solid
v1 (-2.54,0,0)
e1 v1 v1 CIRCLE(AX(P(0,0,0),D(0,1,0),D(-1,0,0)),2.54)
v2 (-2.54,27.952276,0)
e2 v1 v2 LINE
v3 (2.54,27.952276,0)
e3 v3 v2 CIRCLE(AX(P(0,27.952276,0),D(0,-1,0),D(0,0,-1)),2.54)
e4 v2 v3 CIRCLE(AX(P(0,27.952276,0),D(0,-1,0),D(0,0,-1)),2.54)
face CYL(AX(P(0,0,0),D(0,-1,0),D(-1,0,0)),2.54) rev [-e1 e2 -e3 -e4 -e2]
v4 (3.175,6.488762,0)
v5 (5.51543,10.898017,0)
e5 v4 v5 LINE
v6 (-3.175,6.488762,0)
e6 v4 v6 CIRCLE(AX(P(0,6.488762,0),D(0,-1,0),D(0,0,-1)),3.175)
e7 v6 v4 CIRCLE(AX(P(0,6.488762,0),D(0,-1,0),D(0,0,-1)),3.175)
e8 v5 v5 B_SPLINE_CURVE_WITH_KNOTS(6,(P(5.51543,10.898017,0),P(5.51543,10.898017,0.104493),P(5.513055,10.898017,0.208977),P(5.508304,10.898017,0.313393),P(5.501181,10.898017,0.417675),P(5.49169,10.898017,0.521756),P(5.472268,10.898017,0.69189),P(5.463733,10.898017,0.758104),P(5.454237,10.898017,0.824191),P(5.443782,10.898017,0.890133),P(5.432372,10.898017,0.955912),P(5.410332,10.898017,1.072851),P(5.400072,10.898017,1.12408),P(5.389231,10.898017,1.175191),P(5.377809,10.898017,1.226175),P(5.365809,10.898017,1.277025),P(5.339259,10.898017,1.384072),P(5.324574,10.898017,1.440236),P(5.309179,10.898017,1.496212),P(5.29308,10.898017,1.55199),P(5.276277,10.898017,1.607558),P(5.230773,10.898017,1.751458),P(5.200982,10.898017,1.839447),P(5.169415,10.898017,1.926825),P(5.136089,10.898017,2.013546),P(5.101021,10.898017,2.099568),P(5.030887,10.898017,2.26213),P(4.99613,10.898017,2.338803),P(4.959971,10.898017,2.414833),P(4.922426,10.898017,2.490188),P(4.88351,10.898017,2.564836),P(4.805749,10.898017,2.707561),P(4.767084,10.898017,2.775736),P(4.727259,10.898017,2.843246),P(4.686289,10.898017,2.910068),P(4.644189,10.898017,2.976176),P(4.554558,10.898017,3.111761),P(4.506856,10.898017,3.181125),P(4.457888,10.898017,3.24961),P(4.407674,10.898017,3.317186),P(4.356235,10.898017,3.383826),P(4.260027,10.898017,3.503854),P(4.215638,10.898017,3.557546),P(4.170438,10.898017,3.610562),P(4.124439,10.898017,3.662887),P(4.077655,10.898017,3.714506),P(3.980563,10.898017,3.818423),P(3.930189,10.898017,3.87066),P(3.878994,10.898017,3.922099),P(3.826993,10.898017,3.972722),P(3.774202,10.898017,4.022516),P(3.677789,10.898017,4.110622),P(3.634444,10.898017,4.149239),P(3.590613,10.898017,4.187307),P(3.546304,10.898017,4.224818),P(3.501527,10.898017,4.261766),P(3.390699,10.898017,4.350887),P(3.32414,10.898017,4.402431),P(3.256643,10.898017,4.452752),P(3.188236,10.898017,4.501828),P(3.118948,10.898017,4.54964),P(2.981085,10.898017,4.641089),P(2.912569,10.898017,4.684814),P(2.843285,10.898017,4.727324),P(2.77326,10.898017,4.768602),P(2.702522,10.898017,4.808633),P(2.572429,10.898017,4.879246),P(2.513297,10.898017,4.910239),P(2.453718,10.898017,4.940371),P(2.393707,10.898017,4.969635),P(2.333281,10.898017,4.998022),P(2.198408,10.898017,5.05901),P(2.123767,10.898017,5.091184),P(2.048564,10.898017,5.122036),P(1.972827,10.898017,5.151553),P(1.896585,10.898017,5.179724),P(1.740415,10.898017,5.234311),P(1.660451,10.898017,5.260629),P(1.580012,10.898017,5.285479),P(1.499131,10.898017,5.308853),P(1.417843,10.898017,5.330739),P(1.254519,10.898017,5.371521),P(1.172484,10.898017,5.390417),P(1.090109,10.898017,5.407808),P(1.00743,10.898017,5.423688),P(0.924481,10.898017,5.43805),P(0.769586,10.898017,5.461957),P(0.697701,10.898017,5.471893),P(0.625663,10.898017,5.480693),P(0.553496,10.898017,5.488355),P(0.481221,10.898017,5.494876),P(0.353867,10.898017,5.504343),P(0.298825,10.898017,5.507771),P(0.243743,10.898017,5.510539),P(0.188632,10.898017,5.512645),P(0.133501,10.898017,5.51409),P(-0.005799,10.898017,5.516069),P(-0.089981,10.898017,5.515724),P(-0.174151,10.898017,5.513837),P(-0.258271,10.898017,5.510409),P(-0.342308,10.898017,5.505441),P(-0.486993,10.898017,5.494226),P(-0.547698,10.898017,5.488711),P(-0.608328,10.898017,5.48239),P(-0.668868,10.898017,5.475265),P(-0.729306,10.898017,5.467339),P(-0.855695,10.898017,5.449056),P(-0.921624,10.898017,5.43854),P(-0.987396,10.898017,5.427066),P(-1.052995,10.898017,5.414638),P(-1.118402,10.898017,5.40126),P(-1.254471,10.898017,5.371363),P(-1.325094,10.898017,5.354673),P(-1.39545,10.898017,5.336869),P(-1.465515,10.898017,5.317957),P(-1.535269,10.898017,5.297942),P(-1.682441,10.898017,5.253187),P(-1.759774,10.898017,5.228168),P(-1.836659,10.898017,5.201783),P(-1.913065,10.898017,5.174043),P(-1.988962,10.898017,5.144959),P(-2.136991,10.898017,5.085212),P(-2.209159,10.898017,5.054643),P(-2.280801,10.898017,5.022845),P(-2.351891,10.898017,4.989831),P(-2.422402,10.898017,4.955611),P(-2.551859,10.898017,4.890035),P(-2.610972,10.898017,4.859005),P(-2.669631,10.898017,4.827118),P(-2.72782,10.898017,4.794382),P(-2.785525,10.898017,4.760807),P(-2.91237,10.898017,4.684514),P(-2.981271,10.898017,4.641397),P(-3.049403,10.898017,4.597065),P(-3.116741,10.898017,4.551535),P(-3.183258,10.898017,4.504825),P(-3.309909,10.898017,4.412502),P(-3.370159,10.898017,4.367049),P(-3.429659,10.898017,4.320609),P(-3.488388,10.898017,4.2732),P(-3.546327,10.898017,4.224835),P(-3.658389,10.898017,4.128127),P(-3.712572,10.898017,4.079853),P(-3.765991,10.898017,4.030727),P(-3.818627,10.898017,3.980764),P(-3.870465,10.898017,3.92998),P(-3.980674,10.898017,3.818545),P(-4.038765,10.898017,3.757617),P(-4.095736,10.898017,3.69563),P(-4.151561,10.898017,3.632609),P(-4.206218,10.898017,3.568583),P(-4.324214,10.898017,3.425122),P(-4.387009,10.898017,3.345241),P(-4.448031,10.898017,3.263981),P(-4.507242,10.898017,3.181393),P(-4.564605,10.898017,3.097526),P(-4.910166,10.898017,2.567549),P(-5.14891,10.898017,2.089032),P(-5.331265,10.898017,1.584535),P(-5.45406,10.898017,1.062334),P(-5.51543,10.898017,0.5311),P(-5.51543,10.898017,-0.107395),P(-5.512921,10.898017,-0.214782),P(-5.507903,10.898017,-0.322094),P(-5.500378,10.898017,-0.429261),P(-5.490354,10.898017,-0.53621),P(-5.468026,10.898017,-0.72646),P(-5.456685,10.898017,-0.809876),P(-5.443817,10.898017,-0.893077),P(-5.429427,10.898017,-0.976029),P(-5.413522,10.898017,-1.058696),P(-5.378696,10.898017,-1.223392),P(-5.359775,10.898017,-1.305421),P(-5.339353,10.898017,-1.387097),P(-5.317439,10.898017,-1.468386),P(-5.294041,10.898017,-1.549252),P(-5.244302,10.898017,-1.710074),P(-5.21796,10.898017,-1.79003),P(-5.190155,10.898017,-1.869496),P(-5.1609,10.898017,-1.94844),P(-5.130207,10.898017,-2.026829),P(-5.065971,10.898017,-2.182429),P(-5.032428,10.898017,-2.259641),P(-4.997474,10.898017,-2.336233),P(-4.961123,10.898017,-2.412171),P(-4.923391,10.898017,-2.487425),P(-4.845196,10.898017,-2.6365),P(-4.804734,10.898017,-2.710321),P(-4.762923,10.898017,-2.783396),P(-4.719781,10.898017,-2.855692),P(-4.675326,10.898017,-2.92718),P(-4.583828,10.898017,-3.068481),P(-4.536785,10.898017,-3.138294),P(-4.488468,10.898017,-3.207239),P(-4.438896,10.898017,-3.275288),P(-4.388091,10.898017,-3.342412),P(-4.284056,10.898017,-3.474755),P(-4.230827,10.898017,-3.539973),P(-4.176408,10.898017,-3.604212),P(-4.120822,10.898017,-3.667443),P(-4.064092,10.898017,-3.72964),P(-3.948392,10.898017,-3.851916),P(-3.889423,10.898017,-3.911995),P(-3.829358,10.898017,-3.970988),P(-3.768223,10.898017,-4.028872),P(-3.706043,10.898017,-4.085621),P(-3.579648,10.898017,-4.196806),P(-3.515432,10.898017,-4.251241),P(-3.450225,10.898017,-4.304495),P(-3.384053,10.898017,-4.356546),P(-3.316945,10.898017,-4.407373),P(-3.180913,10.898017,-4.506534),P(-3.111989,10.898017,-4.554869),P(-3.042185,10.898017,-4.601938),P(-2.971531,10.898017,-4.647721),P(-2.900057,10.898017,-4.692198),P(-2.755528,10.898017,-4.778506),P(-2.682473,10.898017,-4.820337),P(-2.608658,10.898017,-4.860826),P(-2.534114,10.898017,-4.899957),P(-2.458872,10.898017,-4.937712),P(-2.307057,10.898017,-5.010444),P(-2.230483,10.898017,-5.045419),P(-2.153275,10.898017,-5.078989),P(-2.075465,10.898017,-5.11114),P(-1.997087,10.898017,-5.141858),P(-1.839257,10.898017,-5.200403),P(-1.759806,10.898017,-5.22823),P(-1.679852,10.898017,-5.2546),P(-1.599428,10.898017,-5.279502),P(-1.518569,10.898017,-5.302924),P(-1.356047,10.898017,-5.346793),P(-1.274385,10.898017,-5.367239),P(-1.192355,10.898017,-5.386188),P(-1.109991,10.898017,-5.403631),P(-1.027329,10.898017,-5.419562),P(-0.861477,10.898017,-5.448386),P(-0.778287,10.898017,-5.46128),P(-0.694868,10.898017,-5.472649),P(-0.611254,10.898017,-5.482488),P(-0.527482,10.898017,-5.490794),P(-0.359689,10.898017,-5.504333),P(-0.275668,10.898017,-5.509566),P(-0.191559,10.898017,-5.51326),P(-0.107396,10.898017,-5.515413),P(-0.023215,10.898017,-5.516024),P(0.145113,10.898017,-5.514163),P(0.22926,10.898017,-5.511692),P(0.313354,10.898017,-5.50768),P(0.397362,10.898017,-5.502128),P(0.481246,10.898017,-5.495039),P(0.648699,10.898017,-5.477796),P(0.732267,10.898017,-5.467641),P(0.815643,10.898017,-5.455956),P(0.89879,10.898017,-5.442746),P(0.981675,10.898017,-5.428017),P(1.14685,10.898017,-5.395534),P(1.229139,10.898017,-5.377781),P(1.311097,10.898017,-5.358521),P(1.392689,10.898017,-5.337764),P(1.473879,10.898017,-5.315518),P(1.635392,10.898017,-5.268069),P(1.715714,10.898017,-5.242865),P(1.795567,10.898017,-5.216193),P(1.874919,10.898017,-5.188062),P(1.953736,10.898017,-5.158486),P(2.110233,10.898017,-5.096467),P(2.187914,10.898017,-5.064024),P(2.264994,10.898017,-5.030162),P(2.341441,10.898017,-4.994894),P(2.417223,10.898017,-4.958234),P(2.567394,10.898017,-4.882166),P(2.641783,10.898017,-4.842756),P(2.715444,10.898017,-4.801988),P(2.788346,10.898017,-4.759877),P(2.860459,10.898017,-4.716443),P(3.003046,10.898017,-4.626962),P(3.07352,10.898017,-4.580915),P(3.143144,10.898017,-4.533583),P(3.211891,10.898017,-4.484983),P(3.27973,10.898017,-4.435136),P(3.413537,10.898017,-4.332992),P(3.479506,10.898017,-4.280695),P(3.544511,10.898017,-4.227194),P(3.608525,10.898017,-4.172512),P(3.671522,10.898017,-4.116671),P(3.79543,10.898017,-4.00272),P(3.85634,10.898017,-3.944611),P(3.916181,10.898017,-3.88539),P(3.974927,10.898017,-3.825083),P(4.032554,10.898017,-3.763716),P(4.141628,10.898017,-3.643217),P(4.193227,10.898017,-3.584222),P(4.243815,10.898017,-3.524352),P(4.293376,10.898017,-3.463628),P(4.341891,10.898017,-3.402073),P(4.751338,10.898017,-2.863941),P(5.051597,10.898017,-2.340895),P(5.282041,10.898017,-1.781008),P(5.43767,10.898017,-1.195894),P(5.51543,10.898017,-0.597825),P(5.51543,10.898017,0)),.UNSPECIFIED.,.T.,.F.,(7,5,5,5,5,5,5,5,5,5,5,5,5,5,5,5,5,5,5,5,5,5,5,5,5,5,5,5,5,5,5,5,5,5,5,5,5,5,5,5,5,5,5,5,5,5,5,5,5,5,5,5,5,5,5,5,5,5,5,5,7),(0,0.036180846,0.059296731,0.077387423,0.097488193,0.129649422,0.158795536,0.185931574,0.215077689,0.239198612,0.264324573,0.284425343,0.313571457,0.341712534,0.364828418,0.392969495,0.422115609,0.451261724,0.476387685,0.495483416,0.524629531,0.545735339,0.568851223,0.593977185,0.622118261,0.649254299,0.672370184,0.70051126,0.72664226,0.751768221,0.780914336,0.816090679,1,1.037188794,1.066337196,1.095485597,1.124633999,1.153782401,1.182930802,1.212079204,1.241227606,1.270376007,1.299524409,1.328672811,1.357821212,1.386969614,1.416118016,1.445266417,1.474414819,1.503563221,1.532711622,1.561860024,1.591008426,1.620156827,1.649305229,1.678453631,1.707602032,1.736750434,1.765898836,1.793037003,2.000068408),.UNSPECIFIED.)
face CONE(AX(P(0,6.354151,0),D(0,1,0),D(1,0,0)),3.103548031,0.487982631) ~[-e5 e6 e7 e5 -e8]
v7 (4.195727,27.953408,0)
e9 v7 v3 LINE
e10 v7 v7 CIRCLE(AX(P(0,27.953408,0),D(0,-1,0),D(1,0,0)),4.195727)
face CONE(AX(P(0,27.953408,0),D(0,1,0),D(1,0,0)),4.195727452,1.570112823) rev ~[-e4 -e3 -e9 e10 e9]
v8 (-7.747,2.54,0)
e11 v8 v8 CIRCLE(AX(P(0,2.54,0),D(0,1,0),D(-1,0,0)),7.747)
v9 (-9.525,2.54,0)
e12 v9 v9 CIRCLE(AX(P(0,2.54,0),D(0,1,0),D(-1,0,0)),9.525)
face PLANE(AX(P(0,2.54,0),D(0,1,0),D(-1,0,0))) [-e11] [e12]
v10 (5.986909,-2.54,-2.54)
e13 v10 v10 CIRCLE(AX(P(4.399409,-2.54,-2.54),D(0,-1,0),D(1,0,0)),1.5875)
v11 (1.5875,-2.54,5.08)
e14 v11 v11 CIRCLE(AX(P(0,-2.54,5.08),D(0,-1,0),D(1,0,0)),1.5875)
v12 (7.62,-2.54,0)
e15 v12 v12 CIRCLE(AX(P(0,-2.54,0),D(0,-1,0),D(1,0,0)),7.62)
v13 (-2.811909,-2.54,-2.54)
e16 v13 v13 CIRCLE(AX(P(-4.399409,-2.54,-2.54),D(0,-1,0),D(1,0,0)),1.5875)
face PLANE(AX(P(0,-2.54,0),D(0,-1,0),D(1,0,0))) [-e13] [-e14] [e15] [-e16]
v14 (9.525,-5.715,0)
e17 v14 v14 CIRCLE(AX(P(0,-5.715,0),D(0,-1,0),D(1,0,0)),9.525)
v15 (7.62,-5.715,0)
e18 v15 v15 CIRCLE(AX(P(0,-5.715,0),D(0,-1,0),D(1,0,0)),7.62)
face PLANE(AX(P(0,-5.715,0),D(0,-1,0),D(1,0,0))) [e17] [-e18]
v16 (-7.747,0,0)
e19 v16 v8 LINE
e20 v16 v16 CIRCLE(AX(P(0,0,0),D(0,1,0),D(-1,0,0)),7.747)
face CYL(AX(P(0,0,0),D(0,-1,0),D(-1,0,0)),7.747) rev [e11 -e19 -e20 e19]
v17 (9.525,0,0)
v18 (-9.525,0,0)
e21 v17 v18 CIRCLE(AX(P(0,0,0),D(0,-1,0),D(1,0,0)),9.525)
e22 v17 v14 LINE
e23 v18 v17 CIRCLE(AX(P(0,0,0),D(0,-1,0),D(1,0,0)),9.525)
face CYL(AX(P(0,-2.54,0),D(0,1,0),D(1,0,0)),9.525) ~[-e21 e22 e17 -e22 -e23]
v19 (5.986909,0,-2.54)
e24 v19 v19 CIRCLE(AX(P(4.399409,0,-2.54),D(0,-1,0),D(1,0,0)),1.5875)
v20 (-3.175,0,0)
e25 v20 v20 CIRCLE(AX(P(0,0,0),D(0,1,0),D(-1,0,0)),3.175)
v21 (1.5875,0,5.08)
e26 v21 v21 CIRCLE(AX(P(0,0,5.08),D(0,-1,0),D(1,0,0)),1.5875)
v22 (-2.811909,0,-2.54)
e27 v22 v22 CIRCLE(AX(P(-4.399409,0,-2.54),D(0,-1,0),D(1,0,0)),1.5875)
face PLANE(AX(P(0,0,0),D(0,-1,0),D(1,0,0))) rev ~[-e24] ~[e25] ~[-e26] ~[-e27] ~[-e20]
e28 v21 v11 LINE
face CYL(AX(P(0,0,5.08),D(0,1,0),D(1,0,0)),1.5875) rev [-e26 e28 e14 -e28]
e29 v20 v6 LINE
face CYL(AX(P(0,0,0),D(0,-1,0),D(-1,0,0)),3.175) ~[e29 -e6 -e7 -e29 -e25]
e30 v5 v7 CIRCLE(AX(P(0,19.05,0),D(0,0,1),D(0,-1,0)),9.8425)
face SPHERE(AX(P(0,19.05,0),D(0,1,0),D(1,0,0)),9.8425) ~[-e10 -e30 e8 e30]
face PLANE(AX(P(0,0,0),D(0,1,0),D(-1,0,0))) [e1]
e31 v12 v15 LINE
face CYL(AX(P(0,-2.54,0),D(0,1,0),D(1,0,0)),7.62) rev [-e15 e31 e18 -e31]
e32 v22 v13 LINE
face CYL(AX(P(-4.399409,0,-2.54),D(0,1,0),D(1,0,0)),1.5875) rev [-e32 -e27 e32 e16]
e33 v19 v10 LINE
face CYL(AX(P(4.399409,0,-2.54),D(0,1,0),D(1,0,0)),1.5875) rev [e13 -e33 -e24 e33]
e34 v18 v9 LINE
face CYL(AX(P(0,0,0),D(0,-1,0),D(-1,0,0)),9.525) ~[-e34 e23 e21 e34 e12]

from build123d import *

# Parameters (mm, degrees)
F0_R         = 9.525
F0_R_2       = 1.5875
F1_DEPTH     = 2.54
F2_R         = 9.525
F2_R_2       = 7.62
F3_DEPTH     = 3.175
F4_R         = 9.525
F4_R_2       = 7.747
F5_DEPTH     = 2.54
F6_R         = 3.175
F7_DEPTH     = 12.7
F10_R        = 2.54
F11_DEPTH    = 27.9544081902
F12_T2_ANGLE = 180
F12_T4_ANGLE = 180


# Not quite as in the source:
# - a fillet or chamfer that OpenCascade refuses, or shapes differently, is made with other operations: its cross-section is extruded or revolved along the edge and cut away or added


with BuildPart() as f1:
    # F0 (on Front) → F1 (new body)
    with BuildSketch(Plane.XZ):
        Circle(F0_R)
        with Locations((-4.3994090512, -2.54)):
            Circle(F0_R_2, mode=Mode.SUBTRACT)
        with Locations((4.3994090512, -2.54)):
            Circle(F0_R_2, mode=Mode.SUBTRACT)
        with Locations((0, 5.08)):
            Circle(F0_R_2, mode=Mode.SUBTRACT)
    extrude(amount=F1_DEPTH)

    # F2 (on face) → F3 (join)
    with BuildSketch(Plane.XZ.offset(2.54)):
        Circle(F2_R)
        Circle(F2_R_2, mode=Mode.SUBTRACT)
    extrude(amount=F3_DEPTH)

    # F4 (on face) → F5 (join)
    with BuildSketch(Plane(origin=(0, 0, 0), x_dir=(-1, 0, 0), z_dir=(0, 1, 0))):
        Circle(F4_R)
        Circle(F4_R_2, mode=Mode.SUBTRACT)
    extrude(amount=F5_DEPTH)

    # F6 (on face) → F7 (join)
    with BuildSketch(Plane(origin=(0, 0, 0), x_dir=(-1, 0, 0), z_dir=(0, 1, 0))):
        Circle(F6_R)
    extrude(amount=F7_DEPTH)

    # F8 (on Top) → F9 (revolve)
    with BuildSketch(Plane.XY):
        with BuildLine():
            Line((0, 27.9505403934), (0, 9.2075))
            ThreePointArc((0, 9.2075), (9.6048581812, 16.9002312755), (4.1957274517, 27.9534081902))
            Line((4.1957274517, 27.9534081902), (0, 27.9505403934))
        make_face()
    revolve(axis=Axis((0, 12.9395495169, 0), (0, -1, 0)))

    # F10 (on face) → F11 (cut, through all)
    with BuildSketch(Plane(origin=(0, 0, 0), x_dir=(-1, 0, 0), z_dir=(0, 1, 0))):
        Circle(F10_R)
    extrude(amount=F11_DEPTH, mode=Mode.SUBTRACT)

    # F12: chamfer of 3.81 on 2 edges, made by hand

    # F12_s1 → F12_t2 (revolve)
    with BuildSketch(Plane.XY):
        with BuildLine():
            Line((-3.1035480311, 6.3541505323), (-5.586882311, 11.0326284828))
            Line((-5.586882311, 11.0326284828), (-5.5441822052, 11.0957406129))
            ThreePointArc((-5.5441822052, 11.0957406129), (-4.405806786, 10.3339526014), (-3.1504193548, 9.8057870222))
            Line((-3.1504193548, 9.8057870222), (-3.0988, 9.733660523))
            ThreePointArc((-3.0988, 9.733660523), (-3.0988, 8.0439055277), (-3.0273480311, 6.3541505323))
            Line((-3.0273480311, 6.3541505323), (-3.1035480311, 6.3541505323))
        make_face()
    revolve(axis=Axis((0, 9.733660523, 0), (0, -1, 0)), revolution_arc=F12_T2_ANGLE)

    # F12_s3 → F12_t4 (revolve)
    with BuildSketch(Plane.XY):
        with BuildLine():
            Line((3.1035480311, 6.3541505323), (5.586882311, 11.0326284828))
            Line((5.586882311, 11.0326284828), (5.5441822052, 11.0957406129))
            ThreePointArc((5.5441822052, 11.0957406129), (4.405806786, 10.3339526014), (3.1504193548, 9.8057870222))
            Line((3.1504193548, 9.8057870222), (3.0988, 9.733660523))
            ThreePointArc((3.0988, 9.733660523), (3.0988, 8.0439055277), (3.0273480311, 6.3541505323))
            Line((3.0273480311, 6.3541505323), (3.1035480311, 6.3541505323))
        make_face()
    revolve(axis=Axis((0, 9.733660523, 0), (0, -1, 0)), revolution_arc=F12_T4_ANGLE)


solid = f1.part
